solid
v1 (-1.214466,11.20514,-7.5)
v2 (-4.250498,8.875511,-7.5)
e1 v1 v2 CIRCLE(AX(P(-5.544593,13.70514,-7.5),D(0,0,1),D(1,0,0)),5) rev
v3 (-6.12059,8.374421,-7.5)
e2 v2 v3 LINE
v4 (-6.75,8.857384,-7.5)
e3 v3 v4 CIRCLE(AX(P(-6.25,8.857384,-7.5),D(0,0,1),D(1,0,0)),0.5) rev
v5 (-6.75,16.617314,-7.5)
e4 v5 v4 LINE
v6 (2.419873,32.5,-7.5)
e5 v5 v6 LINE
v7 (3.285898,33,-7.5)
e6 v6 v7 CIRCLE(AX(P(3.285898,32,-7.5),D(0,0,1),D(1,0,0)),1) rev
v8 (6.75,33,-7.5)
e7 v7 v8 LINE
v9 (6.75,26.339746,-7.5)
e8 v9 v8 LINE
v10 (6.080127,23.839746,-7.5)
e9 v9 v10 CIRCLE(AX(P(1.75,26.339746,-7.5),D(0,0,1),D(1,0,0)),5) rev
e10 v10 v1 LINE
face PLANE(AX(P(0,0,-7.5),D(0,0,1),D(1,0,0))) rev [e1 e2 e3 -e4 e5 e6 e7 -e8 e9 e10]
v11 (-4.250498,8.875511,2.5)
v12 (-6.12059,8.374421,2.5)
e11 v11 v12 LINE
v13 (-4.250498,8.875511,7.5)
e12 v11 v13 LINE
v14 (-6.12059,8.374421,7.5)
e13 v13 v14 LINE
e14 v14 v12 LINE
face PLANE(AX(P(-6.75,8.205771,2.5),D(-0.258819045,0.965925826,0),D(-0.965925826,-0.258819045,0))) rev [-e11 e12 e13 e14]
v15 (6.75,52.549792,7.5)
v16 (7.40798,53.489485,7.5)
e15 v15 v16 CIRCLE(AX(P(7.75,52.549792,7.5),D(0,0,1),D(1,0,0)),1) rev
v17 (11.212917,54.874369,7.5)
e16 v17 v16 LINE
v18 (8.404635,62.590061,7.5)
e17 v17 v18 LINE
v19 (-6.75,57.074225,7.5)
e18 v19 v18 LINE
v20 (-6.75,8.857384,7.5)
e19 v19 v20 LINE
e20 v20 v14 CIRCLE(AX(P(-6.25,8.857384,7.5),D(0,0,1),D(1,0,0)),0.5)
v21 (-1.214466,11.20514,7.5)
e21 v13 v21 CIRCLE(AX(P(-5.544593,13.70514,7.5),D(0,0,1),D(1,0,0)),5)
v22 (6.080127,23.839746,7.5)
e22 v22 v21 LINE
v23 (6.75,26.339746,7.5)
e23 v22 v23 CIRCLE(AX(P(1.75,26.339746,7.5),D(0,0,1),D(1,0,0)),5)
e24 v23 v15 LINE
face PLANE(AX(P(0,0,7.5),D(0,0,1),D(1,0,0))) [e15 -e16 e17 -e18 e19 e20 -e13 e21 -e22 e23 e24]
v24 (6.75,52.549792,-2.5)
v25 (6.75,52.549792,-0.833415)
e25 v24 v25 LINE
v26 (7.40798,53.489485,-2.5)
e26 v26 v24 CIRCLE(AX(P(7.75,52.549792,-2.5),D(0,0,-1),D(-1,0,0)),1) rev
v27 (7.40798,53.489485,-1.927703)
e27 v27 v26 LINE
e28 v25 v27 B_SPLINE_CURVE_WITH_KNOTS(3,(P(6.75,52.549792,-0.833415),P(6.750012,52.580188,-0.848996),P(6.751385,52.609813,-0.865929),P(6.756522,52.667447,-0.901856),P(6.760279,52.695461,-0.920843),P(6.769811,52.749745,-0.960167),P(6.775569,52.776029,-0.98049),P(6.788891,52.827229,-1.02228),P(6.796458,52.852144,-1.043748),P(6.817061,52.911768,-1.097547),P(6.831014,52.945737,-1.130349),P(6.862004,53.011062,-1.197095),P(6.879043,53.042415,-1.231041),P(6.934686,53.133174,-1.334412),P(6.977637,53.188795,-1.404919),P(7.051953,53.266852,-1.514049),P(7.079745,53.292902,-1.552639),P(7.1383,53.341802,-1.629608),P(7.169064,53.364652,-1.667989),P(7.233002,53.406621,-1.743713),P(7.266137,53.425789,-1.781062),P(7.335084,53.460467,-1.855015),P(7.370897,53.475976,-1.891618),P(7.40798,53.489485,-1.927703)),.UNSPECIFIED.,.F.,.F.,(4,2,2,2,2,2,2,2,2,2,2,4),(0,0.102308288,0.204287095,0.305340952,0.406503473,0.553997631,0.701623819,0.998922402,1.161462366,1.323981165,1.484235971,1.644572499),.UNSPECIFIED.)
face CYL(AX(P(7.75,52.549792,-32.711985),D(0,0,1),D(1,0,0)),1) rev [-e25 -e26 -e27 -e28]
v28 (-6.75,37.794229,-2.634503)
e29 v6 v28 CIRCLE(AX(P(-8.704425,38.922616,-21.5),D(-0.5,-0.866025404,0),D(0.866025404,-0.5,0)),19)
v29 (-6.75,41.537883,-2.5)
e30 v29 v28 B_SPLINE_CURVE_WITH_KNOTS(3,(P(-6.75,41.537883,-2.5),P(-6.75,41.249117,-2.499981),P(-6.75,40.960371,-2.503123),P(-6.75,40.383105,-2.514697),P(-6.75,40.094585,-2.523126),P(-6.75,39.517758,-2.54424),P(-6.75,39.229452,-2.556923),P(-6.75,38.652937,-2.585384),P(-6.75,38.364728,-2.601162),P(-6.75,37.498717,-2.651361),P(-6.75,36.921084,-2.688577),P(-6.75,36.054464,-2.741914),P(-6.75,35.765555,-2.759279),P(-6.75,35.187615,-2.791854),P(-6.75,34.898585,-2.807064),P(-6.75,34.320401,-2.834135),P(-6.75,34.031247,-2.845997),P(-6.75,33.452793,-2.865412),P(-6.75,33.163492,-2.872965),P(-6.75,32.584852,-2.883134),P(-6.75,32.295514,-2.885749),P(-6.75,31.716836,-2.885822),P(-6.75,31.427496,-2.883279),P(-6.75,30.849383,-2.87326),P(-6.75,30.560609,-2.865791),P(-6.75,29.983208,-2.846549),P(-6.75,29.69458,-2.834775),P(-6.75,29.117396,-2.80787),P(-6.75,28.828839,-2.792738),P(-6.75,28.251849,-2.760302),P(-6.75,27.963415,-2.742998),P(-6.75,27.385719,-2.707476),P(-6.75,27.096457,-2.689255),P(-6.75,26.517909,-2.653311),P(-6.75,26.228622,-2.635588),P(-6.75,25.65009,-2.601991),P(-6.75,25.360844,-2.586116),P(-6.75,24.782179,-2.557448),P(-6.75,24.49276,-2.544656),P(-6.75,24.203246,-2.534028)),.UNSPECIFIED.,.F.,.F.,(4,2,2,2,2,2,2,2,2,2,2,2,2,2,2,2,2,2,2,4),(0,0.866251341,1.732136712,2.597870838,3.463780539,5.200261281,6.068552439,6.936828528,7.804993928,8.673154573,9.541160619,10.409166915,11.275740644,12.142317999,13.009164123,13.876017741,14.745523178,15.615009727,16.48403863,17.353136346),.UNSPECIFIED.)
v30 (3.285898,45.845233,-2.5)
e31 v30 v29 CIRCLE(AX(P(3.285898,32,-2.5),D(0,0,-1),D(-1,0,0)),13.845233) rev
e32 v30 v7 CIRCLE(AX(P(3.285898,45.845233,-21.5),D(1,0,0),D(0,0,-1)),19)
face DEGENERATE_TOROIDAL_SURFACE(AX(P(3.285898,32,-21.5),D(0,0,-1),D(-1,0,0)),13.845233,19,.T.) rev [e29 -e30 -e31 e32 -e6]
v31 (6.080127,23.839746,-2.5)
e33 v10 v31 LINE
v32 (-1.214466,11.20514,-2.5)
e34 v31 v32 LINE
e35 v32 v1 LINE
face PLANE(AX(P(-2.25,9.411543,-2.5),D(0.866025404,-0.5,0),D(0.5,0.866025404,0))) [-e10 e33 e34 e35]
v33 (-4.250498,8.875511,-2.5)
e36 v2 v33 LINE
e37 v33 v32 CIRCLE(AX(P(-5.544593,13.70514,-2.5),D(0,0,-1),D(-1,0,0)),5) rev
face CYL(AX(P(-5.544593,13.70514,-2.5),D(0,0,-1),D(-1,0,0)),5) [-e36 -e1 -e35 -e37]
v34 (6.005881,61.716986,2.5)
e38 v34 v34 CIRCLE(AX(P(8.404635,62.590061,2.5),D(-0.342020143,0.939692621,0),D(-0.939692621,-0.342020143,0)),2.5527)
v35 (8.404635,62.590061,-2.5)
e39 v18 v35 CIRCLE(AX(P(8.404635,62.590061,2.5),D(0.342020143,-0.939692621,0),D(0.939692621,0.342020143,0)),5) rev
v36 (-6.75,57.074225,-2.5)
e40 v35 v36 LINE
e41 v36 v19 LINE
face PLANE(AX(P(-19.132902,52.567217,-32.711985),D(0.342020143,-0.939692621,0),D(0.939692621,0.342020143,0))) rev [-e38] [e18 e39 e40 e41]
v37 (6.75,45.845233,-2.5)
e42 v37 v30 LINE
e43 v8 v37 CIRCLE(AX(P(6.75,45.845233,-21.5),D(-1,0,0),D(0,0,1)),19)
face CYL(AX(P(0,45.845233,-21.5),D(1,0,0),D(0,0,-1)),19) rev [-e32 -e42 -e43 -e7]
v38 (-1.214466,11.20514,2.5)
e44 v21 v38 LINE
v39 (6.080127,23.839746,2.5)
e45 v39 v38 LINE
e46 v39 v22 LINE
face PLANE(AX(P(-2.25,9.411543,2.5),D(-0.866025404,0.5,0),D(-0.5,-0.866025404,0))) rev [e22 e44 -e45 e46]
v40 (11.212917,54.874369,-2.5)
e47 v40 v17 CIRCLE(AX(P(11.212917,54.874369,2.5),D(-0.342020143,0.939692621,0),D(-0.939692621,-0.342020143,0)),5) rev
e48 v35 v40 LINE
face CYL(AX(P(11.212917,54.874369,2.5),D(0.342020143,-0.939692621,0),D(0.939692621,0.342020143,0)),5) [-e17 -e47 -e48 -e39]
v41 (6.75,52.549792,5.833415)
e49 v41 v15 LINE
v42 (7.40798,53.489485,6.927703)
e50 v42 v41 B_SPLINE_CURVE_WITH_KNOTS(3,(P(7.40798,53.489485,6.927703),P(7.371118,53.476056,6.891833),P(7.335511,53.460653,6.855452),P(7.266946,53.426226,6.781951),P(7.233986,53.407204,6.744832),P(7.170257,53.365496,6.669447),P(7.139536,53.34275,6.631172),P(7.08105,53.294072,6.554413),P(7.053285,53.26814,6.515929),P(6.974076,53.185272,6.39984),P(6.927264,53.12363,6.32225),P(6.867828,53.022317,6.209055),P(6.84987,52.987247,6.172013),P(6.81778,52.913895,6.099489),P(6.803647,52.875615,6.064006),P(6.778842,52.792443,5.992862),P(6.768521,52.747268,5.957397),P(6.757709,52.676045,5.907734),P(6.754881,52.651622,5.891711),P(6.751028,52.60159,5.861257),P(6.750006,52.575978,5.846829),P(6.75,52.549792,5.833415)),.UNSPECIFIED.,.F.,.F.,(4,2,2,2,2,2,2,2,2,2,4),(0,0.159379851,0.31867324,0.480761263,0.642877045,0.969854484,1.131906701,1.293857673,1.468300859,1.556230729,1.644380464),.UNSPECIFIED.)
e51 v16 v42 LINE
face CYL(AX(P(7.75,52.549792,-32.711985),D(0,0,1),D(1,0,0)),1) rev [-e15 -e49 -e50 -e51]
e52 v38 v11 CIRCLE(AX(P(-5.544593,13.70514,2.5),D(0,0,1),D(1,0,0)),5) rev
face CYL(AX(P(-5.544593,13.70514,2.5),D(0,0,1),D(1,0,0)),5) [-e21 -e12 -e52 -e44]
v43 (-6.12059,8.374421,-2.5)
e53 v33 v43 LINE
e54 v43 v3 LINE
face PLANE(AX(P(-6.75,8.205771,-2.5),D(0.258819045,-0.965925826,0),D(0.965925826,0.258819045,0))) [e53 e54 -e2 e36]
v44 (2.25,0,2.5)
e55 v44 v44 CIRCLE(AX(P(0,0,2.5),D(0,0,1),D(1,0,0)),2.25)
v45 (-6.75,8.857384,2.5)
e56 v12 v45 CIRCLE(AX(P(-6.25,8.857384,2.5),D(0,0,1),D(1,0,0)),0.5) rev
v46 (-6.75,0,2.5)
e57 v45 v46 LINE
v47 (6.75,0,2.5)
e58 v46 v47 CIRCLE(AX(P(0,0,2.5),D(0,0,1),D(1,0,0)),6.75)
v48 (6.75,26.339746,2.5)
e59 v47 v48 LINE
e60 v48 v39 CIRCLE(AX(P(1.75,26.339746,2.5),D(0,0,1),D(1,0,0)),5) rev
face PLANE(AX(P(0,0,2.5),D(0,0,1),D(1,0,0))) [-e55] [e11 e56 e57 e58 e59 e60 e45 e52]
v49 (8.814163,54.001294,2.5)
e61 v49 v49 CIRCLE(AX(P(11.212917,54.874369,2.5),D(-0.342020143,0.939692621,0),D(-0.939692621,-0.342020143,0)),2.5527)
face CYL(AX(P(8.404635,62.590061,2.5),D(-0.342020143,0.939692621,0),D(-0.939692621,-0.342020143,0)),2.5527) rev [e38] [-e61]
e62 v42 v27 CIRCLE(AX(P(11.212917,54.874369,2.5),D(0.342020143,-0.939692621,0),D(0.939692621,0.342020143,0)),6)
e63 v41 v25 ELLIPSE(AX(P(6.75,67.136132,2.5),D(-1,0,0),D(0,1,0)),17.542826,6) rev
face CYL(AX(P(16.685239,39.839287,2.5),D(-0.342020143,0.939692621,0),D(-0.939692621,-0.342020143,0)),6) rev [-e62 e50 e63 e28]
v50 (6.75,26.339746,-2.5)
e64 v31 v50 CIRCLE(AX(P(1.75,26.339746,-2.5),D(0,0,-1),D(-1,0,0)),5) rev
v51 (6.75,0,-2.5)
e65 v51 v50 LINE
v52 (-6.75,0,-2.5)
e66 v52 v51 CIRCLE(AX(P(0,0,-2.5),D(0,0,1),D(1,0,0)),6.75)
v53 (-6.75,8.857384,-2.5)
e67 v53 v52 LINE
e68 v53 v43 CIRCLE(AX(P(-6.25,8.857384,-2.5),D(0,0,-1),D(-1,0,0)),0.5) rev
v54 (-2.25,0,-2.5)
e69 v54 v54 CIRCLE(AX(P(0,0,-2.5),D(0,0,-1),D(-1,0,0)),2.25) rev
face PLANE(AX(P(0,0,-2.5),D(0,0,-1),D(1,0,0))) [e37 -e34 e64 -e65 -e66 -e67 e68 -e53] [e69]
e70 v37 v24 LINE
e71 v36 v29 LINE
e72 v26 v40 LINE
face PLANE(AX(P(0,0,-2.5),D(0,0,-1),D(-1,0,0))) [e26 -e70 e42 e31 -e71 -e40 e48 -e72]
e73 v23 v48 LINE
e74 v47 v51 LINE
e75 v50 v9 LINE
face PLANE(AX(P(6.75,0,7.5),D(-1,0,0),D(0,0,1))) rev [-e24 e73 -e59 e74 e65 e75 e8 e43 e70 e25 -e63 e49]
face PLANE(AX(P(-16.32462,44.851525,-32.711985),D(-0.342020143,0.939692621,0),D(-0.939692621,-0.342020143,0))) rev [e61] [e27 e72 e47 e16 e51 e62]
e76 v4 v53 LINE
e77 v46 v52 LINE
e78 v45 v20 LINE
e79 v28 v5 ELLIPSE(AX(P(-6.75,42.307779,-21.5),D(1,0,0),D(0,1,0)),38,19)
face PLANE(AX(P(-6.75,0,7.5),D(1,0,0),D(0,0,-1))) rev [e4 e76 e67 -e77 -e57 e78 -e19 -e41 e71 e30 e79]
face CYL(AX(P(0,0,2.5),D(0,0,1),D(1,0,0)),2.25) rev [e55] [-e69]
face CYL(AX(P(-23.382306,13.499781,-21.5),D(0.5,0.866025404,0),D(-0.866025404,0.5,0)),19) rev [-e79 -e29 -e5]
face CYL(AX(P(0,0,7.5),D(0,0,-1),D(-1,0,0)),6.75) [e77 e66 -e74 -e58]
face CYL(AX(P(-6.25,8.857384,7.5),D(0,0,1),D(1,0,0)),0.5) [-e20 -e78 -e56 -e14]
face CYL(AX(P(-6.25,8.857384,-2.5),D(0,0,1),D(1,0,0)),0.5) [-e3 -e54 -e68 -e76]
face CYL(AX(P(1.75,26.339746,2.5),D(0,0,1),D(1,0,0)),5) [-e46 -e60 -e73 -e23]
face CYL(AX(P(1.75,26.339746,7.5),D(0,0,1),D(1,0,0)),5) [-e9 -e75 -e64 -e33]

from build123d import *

# Parameters (mm, degrees)
BOSS_EXTRUDE1_DEPTH    = 7.5
CUT_EXTRUDE1_DEPTH     = 5
M4_CLEARANCE_HOLE1_D   = 4.5
BOSS_EXTRUDE2_DEPTH    = 15
CUT_EXTRUDE5_START     = -15
CUT_EXTRUDE5_DEPTH     = 5
FILLET8_R              = 1
FILLET4_R              = 19
FILLET1_R              = 0.5
FILLET7_R              = 5
FILLET6_RADIUS         = 5
FILLET6_LENGTH         = 8.210867904
F_10_CLEARANCE_HOLE1_D = 5.1054
FILLET9_R              = 5
FILLET10_R             = 1
SKETCH15_R             = 6
CUT_EXTRUDE7_DEPTH     = 16


with BuildPart() as part:
    # Sketch1 → Boss-Extrude1 (new, symmetric)
    with BuildSketch(Plane.XY):
        with BuildLine():
            Line((-6.749999988, 53.250000012), (6.749999988, 53.250000012))
            Line((6.749999988, 53.250000012), (6.749999988, 0))
            ThreePointArc((6.749999988, 0), (0, -6.749999988), (-6.749999988, 0))
            Line((-6.749999988, 0), (-6.749999988, 53.250000012))
        make_face()
    extrude(amount=BOSS_EXTRUDE1_DEPTH, both=True)

    # Sketch3 → Cut-Extrude1 (cut)
    with BuildSketch(Plane.XY.offset(7.5)):
        with BuildLine():
            Line((-6.749999988, 0), (-6.749999988, 8.205771407))
            Line((-6.749999988, 8.205771407), (-2.249999988, 9.411542773))
            Line((-2.249999988, 9.411542773), (6.749999988, 25))
            Line((6.749999988, 25), (6.749999988, 0))
            ThreePointArc((6.749999988, 0), (0, -6.749999988), (-6.749999988, 0))
        make_face()
    cut_extrude1 = extrude(amount=-CUT_EXTRUDE1_DEPTH, mode=Mode.SUBTRACT)

    # M4 Clearance Hole1 (through all)
    with Locations(Plane.XY.offset(2.5)):
        with Locations((0, 0)):
            Hole(M4_CLEARANCE_HOLE1_D / 2)

    # Mirror1: Cut-Extrude1 across plane
    add(cut_extrude1.mirror(Plane.XY), mode=Mode.SUBTRACT)

    # Sketch8 → Boss-Extrude2 (add)
    with BuildSketch(Plane.XY.offset(7.5)):
        Polygon((13.103097639, 64.300161569), (8.404634535, 62.590060852), (-6.749999988, 57.074224974), (-6.749999988, 53.250000012), (6.749999988, 53.250000012), (15.911379857, 56.584469589), align=None)
    extrude(amount=-BOSS_EXTRUDE2_DEPTH)

    # Sketch9 → Cut-Extrude5 (cut)
    with BuildSketch(Plane.XY.offset(7.5).offset(CUT_EXTRUDE5_START)):
        Polygon((-6.749999988, 16.617314139), (2.708548104, 33), (6.749999988, 33), (6.749999988, 53.250000012), (15.911379857, 56.584469589), (13.103097639, 64.300161569), (-6.749999988, 57.074224974), align=None)
    extrude(amount=CUT_EXTRUDE5_DEPTH, mode=Mode.SUBTRACT)

    # Fillet8
    fillet8_edges = [part.edges().sort_by_distance(p)[0] for p in [
        (2.708548104, 33, -5),
    ]]
    fillet(fillet8_edges, radius=FILLET8_R)

    # Fillet4
    # the kernel refuses this fillet: 19 mm, written as the material it adds along each edge
    with BuildSketch(Plane(origin=(3.285898373, 33, -2.5), x_dir=(0, 1, 0), z_dir=(1, 0, 0))) as fillet4_piece_1:
        with BuildLine():
            CenterArc((12.845232579, -19), FILLET4_R, 90, 42.536898363)
            Line((0, -5), (0, 0))
            Line((0, 0), (12.845232579, 0))
        make_face()
    extrude(amount=3.464101615)
    with BuildSketch(Plane(origin=(-22.806540711, -11.193430188, -2.5), x_dir=(-0.8660254037844388, 0.4999999999999999, 0), z_dir=(0.4999999999999999, 0.8660254037844388, 0))) as fillet4_piece_2_section:
        with BuildLine():
            CenterArc((12.845232579, -19), FILLET4_R, 90, 42.536898363)
            Line((0, -5), (0, 0))
            Line((0, 0), (12.845232579, 0))
        make_face()
    fillet4_piece_2 = extrude(amount=50.452827361, mode=Mode.PRIVATE)
    fillet4_piece_2 = split(fillet4_piece_2, bisect_by=Plane(origin=(-6.749999988, -11.193430188, -2.5), z_dir=(1, 0, 0)), keep=Keep.TOP, mode=Mode.PRIVATE)
    add(fillet4_piece_2)
    with BuildSketch(Plane(origin=(3.285898373, 32, -2.5), x_dir=(-0.8660254037844386, 0.4999999999999999, 0), z_dir=(-0.4999999999999999, -0.8660254037844386, 0))) as fillet4_piece_3_section:
        with BuildLine():
            CenterArc((13.845232579, 19), FILLET4_R, 227.463101637, 42.536898363)
            Line((1, 5), (1, 0))
            Line((1, 0), (13.845232579, 0))
        make_face()
    fillet4_piece_3 = revolve(axis=Axis((3.285898373, 32, -2.5), (0, 0, -1)), revolution_arc=60, mode=Mode.PRIVATE)
    fillet4_piece_3 = split(fillet4_piece_3, bisect_by=Plane(origin=(-6.749999988, 32, -2.5), z_dir=(1, 0, 0)), keep=Keep.TOP, mode=Mode.PRIVATE)
    add(fillet4_piece_3)

    # Fillet1
    fillet1_edges = [part.edges().sort_by_distance(p)[0] for p in [
        (-6.749999988, 8.205771407, 5),
        (-6.749999988, 8.205771407, -5),
    ]]
    fillet(fillet1_edges, radius=FILLET1_R)

    # Fillet7
    fillet7_edges = [part.edges().sort_by_distance(p)[0] for p in [
        (6.749999988, 25, 5),
        (6.749999988, 25, -5),
    ]]
    fillet(fillet7_edges, radius=FILLET7_R)

    # Fillet6: full round fillet: the end face becomes a half cylinder, R = half its width
    fillet6_face = Plane((14.507238748, 60.442315579, 2.5), x_dir=(0.342020143326, -0.939692620786, 0), z_dir=(0.939692620786, 0.342020143326, 0))  # on the end face: x along it, z out of the body
    fillet6_slab = fillet6_face.offset(-FILLET6_RADIUS / 2) * Box(FILLET6_LENGTH, 2 * FILLET6_RADIUS, FILLET6_RADIUS, mode=Mode.PRIVATE)  # the body's end, R deep
    fillet6_round = Plane((9.808775644, 58.732214862, 2.5), x_dir=(0.939692620786, 0.342020143326, 0), z_dir=(0.342020143326, -0.939692620786, 0)) * Cylinder(FILLET6_RADIUS, FILLET6_LENGTH, mode=Mode.PRIVATE)  # its axis R under the face
    add(fillet6_slab - fillet6_round, mode=Mode.SUBTRACT)

    # #10 Clearance Hole1 (through all)
    with Locations(Plane(origin=(-19.132902326, 52.56721711, 0), x_dir=(0.9396926207859103, 0.3420201433256639, 0), z_dir=(-0.3420201433256639, 0.9396926207859103, 0))):
        with Locations((29.304834637, -2.5)):
            Hole(F_10_CLEARANCE_HOLE1_D / 2)

    # Fillet9
    fillet9_edges = [part.edges().sort_by_distance(p)[0] for p in [
        (-2.249999988, 9.411542773, 5),
        (-2.249999988, 9.411542773, -5),
    ]]
    fillet(fillet9_edges, radius=FILLET9_R)

    # Fillet10
    fillet10_edges = [part.edges().sort_by_distance(p)[0] for p in [
        (6.749999988, 53.250000012, 2.5),
    ]]
    fillet(fillet10_edges, radius=FILLET10_R)

    # Sketch15 → Cut-Extrude7 (cut)
    with BuildSketch(Plane(origin=(-16.324620109, 44.85152513, 0), x_dir=(0.9396926207859103, 0.3420201433256634, 0), z_dir=(0.3420201433256634, -0.9396926207859103, 0))):
        with Locations((29.304834637, 2.5)):
            Circle(SKETCH15_R)
    extrude(amount=CUT_EXTRUDE7_DEPTH, mode=Mode.SUBTRACT)


solid = part.part
